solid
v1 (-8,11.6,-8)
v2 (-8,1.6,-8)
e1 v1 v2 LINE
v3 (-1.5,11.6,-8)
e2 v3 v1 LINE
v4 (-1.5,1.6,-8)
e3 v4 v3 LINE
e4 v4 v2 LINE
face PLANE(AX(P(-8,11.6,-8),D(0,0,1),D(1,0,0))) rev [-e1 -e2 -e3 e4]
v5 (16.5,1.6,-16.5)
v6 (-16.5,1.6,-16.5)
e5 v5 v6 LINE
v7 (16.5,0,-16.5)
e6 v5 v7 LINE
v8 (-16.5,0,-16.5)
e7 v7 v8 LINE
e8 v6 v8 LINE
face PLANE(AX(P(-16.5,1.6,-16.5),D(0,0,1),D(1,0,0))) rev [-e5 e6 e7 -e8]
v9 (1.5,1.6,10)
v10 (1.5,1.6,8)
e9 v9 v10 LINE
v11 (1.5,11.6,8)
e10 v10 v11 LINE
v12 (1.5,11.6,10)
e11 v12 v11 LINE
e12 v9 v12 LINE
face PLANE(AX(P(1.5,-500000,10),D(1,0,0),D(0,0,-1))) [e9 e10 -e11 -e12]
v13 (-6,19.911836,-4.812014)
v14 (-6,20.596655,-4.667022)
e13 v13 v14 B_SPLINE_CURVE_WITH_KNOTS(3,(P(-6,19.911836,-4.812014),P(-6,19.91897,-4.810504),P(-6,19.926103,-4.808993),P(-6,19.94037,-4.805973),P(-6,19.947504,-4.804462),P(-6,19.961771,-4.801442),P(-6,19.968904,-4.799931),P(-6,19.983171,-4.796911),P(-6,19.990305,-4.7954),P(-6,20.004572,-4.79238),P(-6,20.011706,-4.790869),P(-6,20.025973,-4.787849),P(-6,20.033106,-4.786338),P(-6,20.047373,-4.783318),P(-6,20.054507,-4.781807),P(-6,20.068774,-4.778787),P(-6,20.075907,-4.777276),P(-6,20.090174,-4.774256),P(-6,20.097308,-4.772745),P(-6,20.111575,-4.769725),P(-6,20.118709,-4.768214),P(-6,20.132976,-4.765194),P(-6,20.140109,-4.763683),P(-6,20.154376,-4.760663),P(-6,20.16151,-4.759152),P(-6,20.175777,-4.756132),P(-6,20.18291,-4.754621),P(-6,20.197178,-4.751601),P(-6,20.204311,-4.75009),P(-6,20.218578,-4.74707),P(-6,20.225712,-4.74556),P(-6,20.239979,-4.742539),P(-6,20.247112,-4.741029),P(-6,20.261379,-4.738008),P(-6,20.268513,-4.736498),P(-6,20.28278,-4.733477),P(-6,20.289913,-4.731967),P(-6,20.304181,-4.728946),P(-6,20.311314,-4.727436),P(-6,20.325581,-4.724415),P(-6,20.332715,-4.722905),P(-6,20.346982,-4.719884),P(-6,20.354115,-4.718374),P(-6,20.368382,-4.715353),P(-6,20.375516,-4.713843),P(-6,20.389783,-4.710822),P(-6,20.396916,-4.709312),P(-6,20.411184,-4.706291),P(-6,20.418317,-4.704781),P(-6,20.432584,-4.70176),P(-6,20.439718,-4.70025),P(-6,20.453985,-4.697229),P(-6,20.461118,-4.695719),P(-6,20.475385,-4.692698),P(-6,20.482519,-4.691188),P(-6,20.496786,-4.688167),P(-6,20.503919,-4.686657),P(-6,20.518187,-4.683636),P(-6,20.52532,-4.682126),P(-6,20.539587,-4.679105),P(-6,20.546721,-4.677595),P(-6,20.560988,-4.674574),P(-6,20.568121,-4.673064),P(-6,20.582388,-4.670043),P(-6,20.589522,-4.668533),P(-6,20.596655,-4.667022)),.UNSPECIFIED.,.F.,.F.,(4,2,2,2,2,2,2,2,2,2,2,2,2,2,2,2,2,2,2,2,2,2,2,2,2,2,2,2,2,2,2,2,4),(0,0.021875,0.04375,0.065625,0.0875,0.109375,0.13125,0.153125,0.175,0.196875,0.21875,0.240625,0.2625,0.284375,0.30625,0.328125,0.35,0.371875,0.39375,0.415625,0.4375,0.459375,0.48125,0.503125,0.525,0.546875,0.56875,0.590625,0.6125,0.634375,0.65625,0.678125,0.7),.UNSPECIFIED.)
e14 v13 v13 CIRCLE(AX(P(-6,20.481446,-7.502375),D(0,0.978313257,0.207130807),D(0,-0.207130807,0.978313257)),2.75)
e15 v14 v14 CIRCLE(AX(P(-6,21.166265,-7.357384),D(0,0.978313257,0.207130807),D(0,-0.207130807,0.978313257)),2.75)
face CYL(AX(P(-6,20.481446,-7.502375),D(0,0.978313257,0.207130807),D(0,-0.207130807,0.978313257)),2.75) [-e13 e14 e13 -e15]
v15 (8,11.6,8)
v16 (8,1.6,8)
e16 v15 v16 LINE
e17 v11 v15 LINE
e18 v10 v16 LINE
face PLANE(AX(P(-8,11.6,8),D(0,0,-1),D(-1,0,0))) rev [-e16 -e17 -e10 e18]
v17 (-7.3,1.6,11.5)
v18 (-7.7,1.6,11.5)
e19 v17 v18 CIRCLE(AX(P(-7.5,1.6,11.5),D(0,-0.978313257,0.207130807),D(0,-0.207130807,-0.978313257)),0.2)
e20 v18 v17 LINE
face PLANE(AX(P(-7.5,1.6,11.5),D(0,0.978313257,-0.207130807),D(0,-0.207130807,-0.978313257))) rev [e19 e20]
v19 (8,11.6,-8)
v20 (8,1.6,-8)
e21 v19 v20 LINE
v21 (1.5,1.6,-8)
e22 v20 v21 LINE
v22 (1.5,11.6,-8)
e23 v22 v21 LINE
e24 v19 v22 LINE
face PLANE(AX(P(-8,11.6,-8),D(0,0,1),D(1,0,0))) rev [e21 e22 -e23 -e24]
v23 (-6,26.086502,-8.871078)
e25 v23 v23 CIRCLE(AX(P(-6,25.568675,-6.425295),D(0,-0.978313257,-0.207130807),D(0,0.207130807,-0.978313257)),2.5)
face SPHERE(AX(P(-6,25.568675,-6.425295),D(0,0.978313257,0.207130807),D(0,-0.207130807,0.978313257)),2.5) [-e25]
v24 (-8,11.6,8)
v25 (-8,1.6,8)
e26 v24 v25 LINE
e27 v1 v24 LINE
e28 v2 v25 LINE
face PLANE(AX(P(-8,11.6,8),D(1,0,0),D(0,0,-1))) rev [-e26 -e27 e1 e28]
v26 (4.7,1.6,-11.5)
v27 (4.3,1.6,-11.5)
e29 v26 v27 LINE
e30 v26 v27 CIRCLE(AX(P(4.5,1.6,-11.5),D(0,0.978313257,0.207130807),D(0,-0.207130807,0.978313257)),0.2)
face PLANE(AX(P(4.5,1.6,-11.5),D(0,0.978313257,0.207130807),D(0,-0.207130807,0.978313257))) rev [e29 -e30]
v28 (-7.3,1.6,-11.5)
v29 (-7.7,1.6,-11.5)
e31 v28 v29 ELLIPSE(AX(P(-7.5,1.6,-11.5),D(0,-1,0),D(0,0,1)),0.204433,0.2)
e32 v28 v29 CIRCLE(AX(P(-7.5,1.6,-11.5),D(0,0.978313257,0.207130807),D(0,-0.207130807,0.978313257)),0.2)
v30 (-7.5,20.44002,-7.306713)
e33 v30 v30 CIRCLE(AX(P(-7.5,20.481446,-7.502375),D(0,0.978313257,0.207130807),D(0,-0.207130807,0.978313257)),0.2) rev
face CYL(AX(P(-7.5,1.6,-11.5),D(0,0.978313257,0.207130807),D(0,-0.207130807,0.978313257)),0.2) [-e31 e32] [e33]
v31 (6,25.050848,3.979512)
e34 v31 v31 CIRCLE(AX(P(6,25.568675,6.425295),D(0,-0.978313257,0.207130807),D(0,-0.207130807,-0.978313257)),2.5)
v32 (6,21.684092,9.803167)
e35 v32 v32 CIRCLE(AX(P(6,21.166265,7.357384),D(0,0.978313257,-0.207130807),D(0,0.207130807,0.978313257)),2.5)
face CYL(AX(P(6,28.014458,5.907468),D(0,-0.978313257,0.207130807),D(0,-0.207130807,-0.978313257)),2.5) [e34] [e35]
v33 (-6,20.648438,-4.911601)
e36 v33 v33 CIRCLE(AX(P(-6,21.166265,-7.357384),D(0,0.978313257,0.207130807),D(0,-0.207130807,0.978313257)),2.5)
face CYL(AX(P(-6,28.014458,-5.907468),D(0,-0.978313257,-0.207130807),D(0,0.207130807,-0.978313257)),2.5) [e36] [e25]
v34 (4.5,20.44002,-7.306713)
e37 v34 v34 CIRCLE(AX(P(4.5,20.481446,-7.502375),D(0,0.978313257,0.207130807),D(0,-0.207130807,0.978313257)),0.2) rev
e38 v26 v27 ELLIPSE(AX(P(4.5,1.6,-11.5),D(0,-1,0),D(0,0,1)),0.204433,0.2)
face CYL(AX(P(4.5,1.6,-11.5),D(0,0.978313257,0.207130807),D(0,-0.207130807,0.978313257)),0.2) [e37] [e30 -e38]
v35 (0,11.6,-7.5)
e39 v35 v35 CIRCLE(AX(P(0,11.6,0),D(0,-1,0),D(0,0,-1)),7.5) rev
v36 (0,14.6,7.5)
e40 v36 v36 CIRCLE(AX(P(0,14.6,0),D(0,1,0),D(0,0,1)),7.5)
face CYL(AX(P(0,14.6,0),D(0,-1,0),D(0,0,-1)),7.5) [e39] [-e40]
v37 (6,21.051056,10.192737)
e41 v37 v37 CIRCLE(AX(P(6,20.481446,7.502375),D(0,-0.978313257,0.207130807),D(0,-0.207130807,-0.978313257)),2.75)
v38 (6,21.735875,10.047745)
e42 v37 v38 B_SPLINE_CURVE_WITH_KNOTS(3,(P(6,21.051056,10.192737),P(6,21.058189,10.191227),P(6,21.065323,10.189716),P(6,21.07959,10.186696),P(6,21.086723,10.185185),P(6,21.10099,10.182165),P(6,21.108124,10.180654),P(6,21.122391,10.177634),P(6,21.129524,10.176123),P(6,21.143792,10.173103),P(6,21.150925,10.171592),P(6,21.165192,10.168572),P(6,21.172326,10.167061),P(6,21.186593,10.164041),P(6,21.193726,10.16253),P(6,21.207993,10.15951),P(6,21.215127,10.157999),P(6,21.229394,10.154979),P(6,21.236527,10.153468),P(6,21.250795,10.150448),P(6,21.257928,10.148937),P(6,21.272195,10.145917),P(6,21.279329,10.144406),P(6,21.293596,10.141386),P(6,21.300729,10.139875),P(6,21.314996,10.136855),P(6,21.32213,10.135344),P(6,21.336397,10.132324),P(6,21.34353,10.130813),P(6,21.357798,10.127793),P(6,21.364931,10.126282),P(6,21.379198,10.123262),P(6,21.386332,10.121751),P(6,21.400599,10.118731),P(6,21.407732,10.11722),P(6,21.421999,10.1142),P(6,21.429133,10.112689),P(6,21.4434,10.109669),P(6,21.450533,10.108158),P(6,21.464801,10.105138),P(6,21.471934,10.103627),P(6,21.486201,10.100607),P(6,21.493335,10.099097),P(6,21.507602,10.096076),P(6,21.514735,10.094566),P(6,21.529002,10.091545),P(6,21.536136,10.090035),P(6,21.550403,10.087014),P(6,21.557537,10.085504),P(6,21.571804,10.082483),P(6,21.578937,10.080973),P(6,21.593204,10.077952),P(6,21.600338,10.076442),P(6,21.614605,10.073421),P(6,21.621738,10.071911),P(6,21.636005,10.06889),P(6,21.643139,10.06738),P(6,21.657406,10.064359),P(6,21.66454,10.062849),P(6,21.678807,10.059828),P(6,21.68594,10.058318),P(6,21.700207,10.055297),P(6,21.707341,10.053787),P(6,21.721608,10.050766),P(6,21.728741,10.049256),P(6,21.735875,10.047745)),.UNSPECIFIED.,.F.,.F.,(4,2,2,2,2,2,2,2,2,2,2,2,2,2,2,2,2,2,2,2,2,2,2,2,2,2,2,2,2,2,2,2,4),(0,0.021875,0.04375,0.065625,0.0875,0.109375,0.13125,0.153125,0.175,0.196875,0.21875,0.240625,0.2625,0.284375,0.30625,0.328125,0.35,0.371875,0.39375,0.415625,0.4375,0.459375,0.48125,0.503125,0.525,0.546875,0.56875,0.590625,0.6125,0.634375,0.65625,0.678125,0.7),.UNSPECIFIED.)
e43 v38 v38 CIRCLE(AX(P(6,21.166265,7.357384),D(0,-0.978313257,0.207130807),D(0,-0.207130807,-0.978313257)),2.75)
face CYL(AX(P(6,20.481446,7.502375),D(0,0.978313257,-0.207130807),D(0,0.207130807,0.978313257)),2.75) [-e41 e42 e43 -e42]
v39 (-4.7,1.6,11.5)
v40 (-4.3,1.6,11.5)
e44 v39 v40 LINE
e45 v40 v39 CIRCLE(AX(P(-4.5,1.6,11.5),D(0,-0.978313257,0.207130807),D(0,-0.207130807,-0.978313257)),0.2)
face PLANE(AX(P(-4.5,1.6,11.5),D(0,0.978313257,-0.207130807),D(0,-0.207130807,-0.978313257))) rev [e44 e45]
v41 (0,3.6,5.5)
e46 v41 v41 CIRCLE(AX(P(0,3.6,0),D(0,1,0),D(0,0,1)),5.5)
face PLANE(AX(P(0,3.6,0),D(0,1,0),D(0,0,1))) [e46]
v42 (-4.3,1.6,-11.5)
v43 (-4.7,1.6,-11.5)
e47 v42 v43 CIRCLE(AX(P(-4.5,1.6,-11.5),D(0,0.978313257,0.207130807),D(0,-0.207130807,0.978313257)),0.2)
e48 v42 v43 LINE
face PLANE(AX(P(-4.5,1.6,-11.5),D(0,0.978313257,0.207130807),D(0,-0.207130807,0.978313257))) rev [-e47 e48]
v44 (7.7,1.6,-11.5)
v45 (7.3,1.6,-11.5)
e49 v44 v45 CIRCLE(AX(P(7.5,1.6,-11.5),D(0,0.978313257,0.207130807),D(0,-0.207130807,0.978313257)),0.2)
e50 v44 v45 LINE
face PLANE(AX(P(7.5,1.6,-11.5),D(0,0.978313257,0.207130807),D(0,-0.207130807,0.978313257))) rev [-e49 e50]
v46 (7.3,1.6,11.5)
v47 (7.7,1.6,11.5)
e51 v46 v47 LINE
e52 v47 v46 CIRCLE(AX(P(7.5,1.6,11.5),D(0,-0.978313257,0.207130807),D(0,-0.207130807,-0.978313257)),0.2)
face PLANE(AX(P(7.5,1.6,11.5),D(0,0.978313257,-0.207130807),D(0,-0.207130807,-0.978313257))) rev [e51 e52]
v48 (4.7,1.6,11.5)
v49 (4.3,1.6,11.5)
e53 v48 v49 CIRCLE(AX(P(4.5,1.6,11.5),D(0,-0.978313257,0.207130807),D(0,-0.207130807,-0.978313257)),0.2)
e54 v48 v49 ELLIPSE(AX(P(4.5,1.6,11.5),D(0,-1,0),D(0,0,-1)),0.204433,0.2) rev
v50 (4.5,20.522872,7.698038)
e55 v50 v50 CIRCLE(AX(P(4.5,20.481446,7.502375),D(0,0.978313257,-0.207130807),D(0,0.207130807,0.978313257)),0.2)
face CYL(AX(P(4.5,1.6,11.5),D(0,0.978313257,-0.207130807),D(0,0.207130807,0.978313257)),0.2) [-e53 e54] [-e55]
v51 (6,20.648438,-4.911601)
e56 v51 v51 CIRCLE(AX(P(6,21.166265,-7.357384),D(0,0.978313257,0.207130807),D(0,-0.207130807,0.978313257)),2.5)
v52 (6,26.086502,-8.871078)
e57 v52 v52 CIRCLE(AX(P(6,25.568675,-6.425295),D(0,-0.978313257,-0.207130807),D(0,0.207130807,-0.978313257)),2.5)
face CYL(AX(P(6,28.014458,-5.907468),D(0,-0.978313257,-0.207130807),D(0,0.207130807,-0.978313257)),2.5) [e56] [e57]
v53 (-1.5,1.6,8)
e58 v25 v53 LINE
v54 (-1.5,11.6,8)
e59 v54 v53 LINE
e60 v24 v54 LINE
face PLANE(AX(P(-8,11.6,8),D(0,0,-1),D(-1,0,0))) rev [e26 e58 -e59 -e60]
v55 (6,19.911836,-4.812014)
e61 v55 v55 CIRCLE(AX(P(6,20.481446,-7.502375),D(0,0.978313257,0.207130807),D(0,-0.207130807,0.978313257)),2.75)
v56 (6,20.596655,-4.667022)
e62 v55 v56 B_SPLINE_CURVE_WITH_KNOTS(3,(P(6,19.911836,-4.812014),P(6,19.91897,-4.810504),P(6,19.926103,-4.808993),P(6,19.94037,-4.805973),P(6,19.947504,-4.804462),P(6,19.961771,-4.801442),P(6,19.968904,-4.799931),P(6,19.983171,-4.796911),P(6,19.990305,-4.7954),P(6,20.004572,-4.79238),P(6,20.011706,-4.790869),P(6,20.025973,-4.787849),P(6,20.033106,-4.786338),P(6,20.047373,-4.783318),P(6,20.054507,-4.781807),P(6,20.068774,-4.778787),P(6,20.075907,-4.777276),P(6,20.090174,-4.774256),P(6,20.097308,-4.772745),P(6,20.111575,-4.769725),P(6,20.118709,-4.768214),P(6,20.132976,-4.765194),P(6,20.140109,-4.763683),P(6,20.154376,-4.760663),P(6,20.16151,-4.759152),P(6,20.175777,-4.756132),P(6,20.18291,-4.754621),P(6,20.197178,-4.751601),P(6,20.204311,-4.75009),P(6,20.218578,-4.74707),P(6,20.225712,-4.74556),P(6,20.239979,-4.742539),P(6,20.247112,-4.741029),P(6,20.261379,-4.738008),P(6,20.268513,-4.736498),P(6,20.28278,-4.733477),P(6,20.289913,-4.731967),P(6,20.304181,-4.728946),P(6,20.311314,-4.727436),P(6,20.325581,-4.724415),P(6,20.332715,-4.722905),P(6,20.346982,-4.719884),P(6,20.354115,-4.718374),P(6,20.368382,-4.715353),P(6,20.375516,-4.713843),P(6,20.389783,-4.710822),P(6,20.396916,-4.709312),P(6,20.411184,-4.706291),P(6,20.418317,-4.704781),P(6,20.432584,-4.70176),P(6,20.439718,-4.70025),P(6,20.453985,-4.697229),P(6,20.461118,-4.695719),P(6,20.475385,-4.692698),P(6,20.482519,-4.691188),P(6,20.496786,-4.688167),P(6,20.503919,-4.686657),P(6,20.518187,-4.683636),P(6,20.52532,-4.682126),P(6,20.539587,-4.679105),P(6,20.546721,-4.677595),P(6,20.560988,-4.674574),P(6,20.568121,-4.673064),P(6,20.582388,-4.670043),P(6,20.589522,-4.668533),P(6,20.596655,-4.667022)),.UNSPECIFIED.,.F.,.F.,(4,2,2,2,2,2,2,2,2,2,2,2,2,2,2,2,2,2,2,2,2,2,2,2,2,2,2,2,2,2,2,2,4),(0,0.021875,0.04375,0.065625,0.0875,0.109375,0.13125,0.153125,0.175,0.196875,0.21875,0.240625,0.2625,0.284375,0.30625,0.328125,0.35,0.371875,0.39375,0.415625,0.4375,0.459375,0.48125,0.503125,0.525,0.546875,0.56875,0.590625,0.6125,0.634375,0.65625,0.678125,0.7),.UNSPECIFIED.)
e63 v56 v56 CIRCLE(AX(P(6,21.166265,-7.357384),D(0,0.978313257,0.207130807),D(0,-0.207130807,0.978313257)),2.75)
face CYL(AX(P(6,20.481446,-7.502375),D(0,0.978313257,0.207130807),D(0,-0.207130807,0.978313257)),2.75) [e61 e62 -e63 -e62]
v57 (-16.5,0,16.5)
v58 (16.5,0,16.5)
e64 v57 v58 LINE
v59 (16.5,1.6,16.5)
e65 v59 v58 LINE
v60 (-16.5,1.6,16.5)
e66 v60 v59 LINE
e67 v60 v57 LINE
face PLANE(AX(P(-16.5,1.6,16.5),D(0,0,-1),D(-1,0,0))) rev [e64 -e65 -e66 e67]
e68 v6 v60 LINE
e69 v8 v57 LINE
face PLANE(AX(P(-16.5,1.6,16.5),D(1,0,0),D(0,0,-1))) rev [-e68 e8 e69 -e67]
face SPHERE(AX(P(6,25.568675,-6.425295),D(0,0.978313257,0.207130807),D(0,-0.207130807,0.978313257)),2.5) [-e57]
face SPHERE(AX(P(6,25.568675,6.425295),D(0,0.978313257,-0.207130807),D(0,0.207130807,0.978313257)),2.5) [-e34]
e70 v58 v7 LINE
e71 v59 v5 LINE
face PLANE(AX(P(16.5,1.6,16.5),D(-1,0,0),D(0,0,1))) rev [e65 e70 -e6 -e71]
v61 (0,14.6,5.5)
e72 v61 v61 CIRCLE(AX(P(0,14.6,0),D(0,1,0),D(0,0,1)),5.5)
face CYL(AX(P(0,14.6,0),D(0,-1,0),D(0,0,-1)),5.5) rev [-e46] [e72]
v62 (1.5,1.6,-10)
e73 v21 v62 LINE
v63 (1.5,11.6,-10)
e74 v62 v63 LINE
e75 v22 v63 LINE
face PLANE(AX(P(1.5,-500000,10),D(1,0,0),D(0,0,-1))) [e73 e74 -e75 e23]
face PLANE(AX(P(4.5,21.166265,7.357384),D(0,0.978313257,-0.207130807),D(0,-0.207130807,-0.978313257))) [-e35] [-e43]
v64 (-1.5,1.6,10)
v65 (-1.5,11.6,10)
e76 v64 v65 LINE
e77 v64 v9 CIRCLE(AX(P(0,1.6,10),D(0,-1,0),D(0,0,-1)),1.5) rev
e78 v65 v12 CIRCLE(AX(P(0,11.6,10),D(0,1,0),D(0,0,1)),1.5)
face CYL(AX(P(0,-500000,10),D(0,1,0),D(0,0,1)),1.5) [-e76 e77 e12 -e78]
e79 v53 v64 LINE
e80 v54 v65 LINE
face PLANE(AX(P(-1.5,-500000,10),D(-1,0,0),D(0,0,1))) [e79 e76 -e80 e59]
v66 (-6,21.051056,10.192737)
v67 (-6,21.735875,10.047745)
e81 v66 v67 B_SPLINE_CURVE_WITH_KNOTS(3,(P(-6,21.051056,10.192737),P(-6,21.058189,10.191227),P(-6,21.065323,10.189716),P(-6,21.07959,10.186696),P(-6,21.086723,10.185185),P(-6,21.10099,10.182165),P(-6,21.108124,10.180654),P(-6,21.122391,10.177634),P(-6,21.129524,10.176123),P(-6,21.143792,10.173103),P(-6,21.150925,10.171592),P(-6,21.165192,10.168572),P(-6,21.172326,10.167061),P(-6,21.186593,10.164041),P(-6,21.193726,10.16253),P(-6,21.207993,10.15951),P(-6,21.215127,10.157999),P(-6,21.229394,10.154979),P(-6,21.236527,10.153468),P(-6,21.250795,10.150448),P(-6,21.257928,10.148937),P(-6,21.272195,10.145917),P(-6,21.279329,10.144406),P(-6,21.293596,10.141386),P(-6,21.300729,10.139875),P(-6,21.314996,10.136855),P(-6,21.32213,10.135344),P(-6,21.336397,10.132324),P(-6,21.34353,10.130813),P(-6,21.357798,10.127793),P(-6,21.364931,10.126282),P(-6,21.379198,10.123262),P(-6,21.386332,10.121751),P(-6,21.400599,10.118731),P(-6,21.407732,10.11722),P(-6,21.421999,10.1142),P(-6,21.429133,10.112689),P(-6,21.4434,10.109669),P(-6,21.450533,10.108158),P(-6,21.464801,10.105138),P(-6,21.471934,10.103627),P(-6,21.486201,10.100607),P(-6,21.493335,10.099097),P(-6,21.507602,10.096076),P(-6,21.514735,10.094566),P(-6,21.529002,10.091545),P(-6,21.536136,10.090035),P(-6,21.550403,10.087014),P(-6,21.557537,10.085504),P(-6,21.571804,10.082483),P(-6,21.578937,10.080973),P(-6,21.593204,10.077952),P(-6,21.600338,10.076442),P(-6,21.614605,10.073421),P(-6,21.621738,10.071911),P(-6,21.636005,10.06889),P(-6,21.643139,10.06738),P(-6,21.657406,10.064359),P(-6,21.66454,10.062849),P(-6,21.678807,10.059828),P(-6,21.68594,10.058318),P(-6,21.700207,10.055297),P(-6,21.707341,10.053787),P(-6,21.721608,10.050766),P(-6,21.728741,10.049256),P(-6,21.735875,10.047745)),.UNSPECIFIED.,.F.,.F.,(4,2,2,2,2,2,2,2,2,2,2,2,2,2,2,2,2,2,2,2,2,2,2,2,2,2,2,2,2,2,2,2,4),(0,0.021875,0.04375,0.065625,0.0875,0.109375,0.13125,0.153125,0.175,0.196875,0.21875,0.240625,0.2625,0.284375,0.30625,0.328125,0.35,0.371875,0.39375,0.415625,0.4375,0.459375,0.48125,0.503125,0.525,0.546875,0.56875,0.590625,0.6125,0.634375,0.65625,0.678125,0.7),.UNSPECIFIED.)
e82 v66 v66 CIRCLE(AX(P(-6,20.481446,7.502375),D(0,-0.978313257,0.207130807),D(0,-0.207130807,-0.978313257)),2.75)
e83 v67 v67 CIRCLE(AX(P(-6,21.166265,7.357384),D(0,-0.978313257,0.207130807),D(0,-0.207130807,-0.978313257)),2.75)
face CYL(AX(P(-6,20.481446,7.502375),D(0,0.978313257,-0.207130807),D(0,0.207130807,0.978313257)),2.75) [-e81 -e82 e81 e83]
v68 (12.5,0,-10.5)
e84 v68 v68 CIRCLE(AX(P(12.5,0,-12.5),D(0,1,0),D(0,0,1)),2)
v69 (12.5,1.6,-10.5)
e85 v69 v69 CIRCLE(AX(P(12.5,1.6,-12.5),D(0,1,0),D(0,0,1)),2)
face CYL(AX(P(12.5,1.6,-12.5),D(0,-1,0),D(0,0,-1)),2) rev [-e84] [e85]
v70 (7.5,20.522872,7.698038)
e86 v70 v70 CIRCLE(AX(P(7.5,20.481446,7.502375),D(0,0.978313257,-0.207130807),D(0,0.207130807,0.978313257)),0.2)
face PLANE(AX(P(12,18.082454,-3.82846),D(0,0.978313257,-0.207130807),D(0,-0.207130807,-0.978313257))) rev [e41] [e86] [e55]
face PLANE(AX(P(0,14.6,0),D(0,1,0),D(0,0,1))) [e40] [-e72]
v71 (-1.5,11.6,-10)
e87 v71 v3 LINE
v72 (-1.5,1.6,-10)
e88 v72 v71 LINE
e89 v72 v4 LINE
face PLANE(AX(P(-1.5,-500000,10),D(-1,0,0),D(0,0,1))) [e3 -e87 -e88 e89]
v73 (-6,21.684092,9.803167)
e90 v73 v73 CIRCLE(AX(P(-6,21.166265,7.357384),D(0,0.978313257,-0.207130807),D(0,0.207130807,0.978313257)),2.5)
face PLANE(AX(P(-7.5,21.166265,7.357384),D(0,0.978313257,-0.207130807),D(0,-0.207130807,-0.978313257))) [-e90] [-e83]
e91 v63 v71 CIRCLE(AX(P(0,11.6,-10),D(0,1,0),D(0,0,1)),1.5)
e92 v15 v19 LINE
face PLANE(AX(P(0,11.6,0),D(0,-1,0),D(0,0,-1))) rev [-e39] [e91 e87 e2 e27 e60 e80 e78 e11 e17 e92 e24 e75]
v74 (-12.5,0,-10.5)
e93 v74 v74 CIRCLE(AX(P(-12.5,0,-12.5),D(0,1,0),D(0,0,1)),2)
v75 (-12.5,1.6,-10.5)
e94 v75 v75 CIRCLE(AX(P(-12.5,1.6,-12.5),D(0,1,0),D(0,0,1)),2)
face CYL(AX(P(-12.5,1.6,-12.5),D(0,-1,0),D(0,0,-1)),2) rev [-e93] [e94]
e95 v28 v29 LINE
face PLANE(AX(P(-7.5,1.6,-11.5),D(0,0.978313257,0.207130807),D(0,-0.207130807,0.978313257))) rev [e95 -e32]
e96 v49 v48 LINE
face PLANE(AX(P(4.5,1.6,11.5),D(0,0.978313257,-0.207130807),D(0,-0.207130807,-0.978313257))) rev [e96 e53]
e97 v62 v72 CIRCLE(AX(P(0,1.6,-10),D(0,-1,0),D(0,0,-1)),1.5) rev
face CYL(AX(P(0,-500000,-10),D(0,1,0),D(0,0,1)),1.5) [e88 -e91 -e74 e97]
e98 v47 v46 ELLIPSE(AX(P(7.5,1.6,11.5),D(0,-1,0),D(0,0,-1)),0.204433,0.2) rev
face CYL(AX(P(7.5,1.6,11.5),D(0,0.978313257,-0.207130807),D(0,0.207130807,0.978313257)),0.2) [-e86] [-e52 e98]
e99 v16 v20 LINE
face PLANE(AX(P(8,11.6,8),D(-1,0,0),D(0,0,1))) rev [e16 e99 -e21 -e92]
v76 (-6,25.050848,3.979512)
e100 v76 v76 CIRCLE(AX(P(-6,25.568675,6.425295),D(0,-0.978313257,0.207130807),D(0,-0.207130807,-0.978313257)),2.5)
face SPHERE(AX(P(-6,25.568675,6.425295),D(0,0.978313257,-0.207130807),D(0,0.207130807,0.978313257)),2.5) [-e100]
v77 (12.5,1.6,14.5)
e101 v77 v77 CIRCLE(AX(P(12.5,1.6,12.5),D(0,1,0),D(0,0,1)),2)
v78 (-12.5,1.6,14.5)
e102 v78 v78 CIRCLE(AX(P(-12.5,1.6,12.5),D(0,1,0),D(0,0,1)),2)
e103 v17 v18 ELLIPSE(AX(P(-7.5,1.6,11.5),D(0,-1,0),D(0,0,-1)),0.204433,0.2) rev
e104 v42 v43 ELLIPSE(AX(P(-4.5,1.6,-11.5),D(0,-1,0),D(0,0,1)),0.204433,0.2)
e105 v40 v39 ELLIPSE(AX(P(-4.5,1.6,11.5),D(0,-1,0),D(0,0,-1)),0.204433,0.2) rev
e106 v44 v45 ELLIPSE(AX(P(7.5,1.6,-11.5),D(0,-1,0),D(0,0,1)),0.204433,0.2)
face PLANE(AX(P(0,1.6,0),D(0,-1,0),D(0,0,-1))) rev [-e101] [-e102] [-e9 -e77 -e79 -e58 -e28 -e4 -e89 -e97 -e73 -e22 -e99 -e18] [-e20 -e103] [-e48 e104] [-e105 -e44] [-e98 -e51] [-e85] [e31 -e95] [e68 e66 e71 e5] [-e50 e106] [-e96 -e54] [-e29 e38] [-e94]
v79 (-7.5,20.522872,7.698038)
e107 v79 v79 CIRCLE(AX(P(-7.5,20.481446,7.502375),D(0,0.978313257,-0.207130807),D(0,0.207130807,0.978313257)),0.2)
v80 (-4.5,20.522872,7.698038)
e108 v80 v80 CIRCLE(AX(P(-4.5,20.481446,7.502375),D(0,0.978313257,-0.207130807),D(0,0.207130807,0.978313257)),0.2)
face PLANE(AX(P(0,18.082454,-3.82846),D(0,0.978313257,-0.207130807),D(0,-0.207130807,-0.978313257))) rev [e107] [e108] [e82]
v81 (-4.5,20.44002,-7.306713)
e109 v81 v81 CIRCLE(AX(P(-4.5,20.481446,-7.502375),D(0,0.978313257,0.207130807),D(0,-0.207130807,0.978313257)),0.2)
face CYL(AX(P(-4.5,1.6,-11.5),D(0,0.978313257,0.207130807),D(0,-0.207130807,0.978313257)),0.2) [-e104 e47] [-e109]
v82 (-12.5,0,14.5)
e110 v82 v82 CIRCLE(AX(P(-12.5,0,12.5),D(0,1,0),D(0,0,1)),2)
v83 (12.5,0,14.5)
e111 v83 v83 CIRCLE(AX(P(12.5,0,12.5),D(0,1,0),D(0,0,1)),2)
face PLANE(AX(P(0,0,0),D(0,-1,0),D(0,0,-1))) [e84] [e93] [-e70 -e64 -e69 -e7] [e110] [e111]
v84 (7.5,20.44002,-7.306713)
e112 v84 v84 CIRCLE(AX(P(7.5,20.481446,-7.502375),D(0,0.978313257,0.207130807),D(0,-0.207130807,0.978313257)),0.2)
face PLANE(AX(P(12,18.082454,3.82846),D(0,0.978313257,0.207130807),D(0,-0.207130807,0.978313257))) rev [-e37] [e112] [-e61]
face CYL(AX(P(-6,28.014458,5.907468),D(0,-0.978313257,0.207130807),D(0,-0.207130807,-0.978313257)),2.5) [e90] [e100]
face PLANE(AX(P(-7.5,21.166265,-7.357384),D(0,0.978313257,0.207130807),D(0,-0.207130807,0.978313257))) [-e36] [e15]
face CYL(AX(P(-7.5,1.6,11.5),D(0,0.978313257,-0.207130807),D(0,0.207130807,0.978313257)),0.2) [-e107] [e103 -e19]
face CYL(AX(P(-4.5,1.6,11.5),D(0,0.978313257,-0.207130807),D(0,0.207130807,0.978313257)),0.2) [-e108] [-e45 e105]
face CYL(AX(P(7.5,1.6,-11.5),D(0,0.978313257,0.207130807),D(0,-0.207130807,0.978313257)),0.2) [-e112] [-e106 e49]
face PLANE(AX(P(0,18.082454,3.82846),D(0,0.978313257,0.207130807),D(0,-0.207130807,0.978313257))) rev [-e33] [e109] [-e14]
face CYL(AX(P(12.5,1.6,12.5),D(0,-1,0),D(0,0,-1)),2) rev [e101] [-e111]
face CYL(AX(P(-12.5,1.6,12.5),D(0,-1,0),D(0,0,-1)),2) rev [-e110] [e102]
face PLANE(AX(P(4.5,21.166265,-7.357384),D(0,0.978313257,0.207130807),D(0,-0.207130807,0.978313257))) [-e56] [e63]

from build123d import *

# Parameters (mm, degrees)
SKETCH1_W                 = 33
SKETCH1_H                 = 33
SKETCH1_R                 = 2
BOSS_EXTRUDE1_DEPTH       = 1.6
SKETCH2_W                 = 16
SKETCH2_H                 = 16
BOSS_EXTRUDE2_DEPTH       = 10
BOSS_EXTRUDE3_START       = -10
BOSS_EXTRUDE3_DEPTH       = 10
SKETCH4_R                 = 7.5
SKETCH4_R_2               = 5.5
BOSS_EXTRUDE4_DEPTH       = 3
CUT_EXTRUDE1_START        = -8
SKETCH5_R                 = 5.5
CUT_EXTRUDE1_DEPTH        = 8
SKETCH7_R                 = 0.2
LPATTERN1_COUNT           = 2
LPATTERN1_PITCH           = 3
SKETCH8_R                 = 2.75
BOSS_EXTRUDE7_DEPTH       = 0.7
SKETCH9_R                 = 2.5
BOSS_EXTRUDE8_DEPTH       = 7
FILLET1_R                 = 2.5
LPATTERN2_COUNT           = 2
LPATTERN2_PITCH           = 12
LPATTERN2_COPY_1_SKETCH_R = 0.2
FILLET1_OF_LPATTERN2_R    = 2.5


# Read off the part's stored shape, not the designer's step: Mirror1
with BuildPart() as part:
    # Sketch1 → Boss-Extrude1 (new body)
    with BuildSketch(Plane(origin=(0, 0, 0), x_dir=(1, 0, 0), z_dir=(0, 1, 0))):
        Rectangle(SKETCH1_W, SKETCH1_H)
        with Locations(Location((-12.5, 12.5, 0), (0, 0, 270))):
            Circle(SKETCH1_R, mode=Mode.SUBTRACT)
        with Locations(Location((12.5, 12.5, 0), (0, 0, 270))):
            Circle(SKETCH1_R, mode=Mode.SUBTRACT)
        with Locations(Location((12.5, -12.5, 0), (0, 0, 270))):
            Circle(SKETCH1_R, mode=Mode.SUBTRACT)
        with Locations(Location((-12.5, -12.5, 0), (0, 0, 270))):
            Circle(SKETCH1_R, mode=Mode.SUBTRACT)
    extrude(amount=BOSS_EXTRUDE1_DEPTH)

    # Sketch2 → Boss-Extrude2 (add)
    with BuildSketch(Plane(origin=(0, 1.6, 0), x_dir=(1, 0, 0), z_dir=(0, 1, 0))):
        Rectangle(SKETCH2_W, SKETCH2_H)
    extrude(amount=BOSS_EXTRUDE2_DEPTH)

    # Sketch3 → Boss-Extrude3 (add)
    with BuildSketch(Plane(origin=(0, 11.6, 0), x_dir=(1, 0, 0), z_dir=(0, 1, 0)).offset(BOSS_EXTRUDE3_START)):
        with BuildLine():
            Line((-1.5, -10), (-1.5, 10))
            ThreePointArc((-1.5, 10), (0, 11.5), (1.5, 10))
            Line((1.5, 10), (1.5, -10))
            ThreePointArc((1.5, -10), (0, -11.5), (-1.5, -10))
        make_face()
    extrude(amount=BOSS_EXTRUDE3_DEPTH)

    # Sketch4 → Boss-Extrude4 (add)
    with BuildSketch(Plane(origin=(0, 11.6, 0), x_dir=(1, 0, 0), z_dir=(0, 1, 0))):
        with Locations(Location((0, 0, 0), (0, 0, 90))):
            Circle(SKETCH4_R)
        with Locations(Location((0, 0, 0), (0, 0, 270))):
            Circle(SKETCH4_R_2, mode=Mode.SUBTRACT)
    extrude(amount=BOSS_EXTRUDE4_DEPTH)

    # Sketch5 → Cut-Extrude1 (cut)
    with BuildSketch(Plane(origin=(0, 11.6, 0), x_dir=(1, 0, 0), z_dir=(0, 1, 0)).offset(CUT_EXTRUDE1_START)):
        with Locations(Location((0, 0, 0), (0, 0, 270))):
            Circle(SKETCH5_R)
    extrude(amount=CUT_EXTRUDE1_DEPTH, mode=Mode.SUBTRACT)

    # Sweep1: sweep along a path in Sketch6
    with BuildLine(Plane.ZY.offset(7.5)) as sweep1_path:
        Line((-11.5, 1.6), (-7.357383869, 21.166265142))
    # Sketch7 → Sweep1 (sweep)
    with BuildSketch(Plane(origin=(-7.5, 21.166265142, -7.357383869), x_dir=(1, 0, 0), z_dir=(0, 0.9783132570757084, 0.2071308065689869))):
        Circle(SKETCH7_R)
    sweep1 = sweep(path=sweep1_path.line)

    # LPattern1: Sweep1 ×2
    with Locations(*[(i * LPATTERN1_PITCH, 0, 0) for i in range(1, LPATTERN1_COUNT)]):
        add(sweep1)

    # Sketch8 → Boss-Extrude7 (add)
    with BuildSketch(Plane(origin=(0, 18.767273707, 3.973451767), x_dir=(1, 0, 0), z_dir=(0, 0.9783132570757084, 0.20713080656898694))):
        with Locations(Location((-6, 11.582011747, 0), (0, 0, 270))):
            Circle(SKETCH8_R)
    boss_extrude7 = extrude(amount=-BOSS_EXTRUDE7_DEPTH)

    # Sketch9 → Boss-Extrude8 (add)
    with BuildSketch(Plane(origin=(0, 18.767273707, 3.973451767), x_dir=(1, 0, 0), z_dir=(0, 0.9783132570757084, 0.20713080656898694))):
        with Locations(Location((-6, 11.582011747, 0), (0, 0, 270))):
            Circle(SKETCH9_R)
    boss_extrude8 = extrude(amount=BOSS_EXTRUDE8_DEPTH)

    # Fillet1
    fillet1_edges = [part.edges().sort_by_distance(p)[0] for p in [
        (-6, 28.532284957, -8.353251365),
    ]]
    fillet(fillet1_edges, radius=FILLET1_R)

    # LPattern2: Sweep1, Boss-Extrude7, Boss-Extrude8 ×2
    with Locations(*[(i * LPATTERN2_PITCH, 0, 0) for i in range(1, LPATTERN2_COUNT)]):
        add(sweep1)
        add(boss_extrude7)
        add(boss_extrude8)

    # LPattern2 copy 1: sweep along a path in LPattern2 copy 1 path
    with BuildLine(Plane.ZY.offset(-7.5)) as lpattern2_copy_1_path:
        Line((-11.5, 1.6), (-7.357383869, 21.166265142))
    # LPattern2 copy 1 sketch → LPattern2 copy 1 (sweep)
    with BuildSketch(Plane(origin=(7.5, 21.166265142, -7.357383869), x_dir=(1, 0, 0), z_dir=(0, 0.9783132570757084, 0.2071308065689869))):
        Circle(LPATTERN2_COPY_1_SKETCH_R)
    sweep(path=lpattern2_copy_1_path.line)

    # Fillet1 of LPattern2
    fillet1_of_lpattern2_edges = [part.edges().sort_by_distance(p)[0] for p in [
        (6, 28.532284957, -8.353251365),
    ]]
    fillet(fillet1_of_lpattern2_edges, radius=FILLET1_OF_LPATTERN2_R)

    # Mirror1: part across plane


with BuildPart() as part_1:
    add(part.part)
    add(part.part.mirror(Plane.XY))


solid = part_1.part
